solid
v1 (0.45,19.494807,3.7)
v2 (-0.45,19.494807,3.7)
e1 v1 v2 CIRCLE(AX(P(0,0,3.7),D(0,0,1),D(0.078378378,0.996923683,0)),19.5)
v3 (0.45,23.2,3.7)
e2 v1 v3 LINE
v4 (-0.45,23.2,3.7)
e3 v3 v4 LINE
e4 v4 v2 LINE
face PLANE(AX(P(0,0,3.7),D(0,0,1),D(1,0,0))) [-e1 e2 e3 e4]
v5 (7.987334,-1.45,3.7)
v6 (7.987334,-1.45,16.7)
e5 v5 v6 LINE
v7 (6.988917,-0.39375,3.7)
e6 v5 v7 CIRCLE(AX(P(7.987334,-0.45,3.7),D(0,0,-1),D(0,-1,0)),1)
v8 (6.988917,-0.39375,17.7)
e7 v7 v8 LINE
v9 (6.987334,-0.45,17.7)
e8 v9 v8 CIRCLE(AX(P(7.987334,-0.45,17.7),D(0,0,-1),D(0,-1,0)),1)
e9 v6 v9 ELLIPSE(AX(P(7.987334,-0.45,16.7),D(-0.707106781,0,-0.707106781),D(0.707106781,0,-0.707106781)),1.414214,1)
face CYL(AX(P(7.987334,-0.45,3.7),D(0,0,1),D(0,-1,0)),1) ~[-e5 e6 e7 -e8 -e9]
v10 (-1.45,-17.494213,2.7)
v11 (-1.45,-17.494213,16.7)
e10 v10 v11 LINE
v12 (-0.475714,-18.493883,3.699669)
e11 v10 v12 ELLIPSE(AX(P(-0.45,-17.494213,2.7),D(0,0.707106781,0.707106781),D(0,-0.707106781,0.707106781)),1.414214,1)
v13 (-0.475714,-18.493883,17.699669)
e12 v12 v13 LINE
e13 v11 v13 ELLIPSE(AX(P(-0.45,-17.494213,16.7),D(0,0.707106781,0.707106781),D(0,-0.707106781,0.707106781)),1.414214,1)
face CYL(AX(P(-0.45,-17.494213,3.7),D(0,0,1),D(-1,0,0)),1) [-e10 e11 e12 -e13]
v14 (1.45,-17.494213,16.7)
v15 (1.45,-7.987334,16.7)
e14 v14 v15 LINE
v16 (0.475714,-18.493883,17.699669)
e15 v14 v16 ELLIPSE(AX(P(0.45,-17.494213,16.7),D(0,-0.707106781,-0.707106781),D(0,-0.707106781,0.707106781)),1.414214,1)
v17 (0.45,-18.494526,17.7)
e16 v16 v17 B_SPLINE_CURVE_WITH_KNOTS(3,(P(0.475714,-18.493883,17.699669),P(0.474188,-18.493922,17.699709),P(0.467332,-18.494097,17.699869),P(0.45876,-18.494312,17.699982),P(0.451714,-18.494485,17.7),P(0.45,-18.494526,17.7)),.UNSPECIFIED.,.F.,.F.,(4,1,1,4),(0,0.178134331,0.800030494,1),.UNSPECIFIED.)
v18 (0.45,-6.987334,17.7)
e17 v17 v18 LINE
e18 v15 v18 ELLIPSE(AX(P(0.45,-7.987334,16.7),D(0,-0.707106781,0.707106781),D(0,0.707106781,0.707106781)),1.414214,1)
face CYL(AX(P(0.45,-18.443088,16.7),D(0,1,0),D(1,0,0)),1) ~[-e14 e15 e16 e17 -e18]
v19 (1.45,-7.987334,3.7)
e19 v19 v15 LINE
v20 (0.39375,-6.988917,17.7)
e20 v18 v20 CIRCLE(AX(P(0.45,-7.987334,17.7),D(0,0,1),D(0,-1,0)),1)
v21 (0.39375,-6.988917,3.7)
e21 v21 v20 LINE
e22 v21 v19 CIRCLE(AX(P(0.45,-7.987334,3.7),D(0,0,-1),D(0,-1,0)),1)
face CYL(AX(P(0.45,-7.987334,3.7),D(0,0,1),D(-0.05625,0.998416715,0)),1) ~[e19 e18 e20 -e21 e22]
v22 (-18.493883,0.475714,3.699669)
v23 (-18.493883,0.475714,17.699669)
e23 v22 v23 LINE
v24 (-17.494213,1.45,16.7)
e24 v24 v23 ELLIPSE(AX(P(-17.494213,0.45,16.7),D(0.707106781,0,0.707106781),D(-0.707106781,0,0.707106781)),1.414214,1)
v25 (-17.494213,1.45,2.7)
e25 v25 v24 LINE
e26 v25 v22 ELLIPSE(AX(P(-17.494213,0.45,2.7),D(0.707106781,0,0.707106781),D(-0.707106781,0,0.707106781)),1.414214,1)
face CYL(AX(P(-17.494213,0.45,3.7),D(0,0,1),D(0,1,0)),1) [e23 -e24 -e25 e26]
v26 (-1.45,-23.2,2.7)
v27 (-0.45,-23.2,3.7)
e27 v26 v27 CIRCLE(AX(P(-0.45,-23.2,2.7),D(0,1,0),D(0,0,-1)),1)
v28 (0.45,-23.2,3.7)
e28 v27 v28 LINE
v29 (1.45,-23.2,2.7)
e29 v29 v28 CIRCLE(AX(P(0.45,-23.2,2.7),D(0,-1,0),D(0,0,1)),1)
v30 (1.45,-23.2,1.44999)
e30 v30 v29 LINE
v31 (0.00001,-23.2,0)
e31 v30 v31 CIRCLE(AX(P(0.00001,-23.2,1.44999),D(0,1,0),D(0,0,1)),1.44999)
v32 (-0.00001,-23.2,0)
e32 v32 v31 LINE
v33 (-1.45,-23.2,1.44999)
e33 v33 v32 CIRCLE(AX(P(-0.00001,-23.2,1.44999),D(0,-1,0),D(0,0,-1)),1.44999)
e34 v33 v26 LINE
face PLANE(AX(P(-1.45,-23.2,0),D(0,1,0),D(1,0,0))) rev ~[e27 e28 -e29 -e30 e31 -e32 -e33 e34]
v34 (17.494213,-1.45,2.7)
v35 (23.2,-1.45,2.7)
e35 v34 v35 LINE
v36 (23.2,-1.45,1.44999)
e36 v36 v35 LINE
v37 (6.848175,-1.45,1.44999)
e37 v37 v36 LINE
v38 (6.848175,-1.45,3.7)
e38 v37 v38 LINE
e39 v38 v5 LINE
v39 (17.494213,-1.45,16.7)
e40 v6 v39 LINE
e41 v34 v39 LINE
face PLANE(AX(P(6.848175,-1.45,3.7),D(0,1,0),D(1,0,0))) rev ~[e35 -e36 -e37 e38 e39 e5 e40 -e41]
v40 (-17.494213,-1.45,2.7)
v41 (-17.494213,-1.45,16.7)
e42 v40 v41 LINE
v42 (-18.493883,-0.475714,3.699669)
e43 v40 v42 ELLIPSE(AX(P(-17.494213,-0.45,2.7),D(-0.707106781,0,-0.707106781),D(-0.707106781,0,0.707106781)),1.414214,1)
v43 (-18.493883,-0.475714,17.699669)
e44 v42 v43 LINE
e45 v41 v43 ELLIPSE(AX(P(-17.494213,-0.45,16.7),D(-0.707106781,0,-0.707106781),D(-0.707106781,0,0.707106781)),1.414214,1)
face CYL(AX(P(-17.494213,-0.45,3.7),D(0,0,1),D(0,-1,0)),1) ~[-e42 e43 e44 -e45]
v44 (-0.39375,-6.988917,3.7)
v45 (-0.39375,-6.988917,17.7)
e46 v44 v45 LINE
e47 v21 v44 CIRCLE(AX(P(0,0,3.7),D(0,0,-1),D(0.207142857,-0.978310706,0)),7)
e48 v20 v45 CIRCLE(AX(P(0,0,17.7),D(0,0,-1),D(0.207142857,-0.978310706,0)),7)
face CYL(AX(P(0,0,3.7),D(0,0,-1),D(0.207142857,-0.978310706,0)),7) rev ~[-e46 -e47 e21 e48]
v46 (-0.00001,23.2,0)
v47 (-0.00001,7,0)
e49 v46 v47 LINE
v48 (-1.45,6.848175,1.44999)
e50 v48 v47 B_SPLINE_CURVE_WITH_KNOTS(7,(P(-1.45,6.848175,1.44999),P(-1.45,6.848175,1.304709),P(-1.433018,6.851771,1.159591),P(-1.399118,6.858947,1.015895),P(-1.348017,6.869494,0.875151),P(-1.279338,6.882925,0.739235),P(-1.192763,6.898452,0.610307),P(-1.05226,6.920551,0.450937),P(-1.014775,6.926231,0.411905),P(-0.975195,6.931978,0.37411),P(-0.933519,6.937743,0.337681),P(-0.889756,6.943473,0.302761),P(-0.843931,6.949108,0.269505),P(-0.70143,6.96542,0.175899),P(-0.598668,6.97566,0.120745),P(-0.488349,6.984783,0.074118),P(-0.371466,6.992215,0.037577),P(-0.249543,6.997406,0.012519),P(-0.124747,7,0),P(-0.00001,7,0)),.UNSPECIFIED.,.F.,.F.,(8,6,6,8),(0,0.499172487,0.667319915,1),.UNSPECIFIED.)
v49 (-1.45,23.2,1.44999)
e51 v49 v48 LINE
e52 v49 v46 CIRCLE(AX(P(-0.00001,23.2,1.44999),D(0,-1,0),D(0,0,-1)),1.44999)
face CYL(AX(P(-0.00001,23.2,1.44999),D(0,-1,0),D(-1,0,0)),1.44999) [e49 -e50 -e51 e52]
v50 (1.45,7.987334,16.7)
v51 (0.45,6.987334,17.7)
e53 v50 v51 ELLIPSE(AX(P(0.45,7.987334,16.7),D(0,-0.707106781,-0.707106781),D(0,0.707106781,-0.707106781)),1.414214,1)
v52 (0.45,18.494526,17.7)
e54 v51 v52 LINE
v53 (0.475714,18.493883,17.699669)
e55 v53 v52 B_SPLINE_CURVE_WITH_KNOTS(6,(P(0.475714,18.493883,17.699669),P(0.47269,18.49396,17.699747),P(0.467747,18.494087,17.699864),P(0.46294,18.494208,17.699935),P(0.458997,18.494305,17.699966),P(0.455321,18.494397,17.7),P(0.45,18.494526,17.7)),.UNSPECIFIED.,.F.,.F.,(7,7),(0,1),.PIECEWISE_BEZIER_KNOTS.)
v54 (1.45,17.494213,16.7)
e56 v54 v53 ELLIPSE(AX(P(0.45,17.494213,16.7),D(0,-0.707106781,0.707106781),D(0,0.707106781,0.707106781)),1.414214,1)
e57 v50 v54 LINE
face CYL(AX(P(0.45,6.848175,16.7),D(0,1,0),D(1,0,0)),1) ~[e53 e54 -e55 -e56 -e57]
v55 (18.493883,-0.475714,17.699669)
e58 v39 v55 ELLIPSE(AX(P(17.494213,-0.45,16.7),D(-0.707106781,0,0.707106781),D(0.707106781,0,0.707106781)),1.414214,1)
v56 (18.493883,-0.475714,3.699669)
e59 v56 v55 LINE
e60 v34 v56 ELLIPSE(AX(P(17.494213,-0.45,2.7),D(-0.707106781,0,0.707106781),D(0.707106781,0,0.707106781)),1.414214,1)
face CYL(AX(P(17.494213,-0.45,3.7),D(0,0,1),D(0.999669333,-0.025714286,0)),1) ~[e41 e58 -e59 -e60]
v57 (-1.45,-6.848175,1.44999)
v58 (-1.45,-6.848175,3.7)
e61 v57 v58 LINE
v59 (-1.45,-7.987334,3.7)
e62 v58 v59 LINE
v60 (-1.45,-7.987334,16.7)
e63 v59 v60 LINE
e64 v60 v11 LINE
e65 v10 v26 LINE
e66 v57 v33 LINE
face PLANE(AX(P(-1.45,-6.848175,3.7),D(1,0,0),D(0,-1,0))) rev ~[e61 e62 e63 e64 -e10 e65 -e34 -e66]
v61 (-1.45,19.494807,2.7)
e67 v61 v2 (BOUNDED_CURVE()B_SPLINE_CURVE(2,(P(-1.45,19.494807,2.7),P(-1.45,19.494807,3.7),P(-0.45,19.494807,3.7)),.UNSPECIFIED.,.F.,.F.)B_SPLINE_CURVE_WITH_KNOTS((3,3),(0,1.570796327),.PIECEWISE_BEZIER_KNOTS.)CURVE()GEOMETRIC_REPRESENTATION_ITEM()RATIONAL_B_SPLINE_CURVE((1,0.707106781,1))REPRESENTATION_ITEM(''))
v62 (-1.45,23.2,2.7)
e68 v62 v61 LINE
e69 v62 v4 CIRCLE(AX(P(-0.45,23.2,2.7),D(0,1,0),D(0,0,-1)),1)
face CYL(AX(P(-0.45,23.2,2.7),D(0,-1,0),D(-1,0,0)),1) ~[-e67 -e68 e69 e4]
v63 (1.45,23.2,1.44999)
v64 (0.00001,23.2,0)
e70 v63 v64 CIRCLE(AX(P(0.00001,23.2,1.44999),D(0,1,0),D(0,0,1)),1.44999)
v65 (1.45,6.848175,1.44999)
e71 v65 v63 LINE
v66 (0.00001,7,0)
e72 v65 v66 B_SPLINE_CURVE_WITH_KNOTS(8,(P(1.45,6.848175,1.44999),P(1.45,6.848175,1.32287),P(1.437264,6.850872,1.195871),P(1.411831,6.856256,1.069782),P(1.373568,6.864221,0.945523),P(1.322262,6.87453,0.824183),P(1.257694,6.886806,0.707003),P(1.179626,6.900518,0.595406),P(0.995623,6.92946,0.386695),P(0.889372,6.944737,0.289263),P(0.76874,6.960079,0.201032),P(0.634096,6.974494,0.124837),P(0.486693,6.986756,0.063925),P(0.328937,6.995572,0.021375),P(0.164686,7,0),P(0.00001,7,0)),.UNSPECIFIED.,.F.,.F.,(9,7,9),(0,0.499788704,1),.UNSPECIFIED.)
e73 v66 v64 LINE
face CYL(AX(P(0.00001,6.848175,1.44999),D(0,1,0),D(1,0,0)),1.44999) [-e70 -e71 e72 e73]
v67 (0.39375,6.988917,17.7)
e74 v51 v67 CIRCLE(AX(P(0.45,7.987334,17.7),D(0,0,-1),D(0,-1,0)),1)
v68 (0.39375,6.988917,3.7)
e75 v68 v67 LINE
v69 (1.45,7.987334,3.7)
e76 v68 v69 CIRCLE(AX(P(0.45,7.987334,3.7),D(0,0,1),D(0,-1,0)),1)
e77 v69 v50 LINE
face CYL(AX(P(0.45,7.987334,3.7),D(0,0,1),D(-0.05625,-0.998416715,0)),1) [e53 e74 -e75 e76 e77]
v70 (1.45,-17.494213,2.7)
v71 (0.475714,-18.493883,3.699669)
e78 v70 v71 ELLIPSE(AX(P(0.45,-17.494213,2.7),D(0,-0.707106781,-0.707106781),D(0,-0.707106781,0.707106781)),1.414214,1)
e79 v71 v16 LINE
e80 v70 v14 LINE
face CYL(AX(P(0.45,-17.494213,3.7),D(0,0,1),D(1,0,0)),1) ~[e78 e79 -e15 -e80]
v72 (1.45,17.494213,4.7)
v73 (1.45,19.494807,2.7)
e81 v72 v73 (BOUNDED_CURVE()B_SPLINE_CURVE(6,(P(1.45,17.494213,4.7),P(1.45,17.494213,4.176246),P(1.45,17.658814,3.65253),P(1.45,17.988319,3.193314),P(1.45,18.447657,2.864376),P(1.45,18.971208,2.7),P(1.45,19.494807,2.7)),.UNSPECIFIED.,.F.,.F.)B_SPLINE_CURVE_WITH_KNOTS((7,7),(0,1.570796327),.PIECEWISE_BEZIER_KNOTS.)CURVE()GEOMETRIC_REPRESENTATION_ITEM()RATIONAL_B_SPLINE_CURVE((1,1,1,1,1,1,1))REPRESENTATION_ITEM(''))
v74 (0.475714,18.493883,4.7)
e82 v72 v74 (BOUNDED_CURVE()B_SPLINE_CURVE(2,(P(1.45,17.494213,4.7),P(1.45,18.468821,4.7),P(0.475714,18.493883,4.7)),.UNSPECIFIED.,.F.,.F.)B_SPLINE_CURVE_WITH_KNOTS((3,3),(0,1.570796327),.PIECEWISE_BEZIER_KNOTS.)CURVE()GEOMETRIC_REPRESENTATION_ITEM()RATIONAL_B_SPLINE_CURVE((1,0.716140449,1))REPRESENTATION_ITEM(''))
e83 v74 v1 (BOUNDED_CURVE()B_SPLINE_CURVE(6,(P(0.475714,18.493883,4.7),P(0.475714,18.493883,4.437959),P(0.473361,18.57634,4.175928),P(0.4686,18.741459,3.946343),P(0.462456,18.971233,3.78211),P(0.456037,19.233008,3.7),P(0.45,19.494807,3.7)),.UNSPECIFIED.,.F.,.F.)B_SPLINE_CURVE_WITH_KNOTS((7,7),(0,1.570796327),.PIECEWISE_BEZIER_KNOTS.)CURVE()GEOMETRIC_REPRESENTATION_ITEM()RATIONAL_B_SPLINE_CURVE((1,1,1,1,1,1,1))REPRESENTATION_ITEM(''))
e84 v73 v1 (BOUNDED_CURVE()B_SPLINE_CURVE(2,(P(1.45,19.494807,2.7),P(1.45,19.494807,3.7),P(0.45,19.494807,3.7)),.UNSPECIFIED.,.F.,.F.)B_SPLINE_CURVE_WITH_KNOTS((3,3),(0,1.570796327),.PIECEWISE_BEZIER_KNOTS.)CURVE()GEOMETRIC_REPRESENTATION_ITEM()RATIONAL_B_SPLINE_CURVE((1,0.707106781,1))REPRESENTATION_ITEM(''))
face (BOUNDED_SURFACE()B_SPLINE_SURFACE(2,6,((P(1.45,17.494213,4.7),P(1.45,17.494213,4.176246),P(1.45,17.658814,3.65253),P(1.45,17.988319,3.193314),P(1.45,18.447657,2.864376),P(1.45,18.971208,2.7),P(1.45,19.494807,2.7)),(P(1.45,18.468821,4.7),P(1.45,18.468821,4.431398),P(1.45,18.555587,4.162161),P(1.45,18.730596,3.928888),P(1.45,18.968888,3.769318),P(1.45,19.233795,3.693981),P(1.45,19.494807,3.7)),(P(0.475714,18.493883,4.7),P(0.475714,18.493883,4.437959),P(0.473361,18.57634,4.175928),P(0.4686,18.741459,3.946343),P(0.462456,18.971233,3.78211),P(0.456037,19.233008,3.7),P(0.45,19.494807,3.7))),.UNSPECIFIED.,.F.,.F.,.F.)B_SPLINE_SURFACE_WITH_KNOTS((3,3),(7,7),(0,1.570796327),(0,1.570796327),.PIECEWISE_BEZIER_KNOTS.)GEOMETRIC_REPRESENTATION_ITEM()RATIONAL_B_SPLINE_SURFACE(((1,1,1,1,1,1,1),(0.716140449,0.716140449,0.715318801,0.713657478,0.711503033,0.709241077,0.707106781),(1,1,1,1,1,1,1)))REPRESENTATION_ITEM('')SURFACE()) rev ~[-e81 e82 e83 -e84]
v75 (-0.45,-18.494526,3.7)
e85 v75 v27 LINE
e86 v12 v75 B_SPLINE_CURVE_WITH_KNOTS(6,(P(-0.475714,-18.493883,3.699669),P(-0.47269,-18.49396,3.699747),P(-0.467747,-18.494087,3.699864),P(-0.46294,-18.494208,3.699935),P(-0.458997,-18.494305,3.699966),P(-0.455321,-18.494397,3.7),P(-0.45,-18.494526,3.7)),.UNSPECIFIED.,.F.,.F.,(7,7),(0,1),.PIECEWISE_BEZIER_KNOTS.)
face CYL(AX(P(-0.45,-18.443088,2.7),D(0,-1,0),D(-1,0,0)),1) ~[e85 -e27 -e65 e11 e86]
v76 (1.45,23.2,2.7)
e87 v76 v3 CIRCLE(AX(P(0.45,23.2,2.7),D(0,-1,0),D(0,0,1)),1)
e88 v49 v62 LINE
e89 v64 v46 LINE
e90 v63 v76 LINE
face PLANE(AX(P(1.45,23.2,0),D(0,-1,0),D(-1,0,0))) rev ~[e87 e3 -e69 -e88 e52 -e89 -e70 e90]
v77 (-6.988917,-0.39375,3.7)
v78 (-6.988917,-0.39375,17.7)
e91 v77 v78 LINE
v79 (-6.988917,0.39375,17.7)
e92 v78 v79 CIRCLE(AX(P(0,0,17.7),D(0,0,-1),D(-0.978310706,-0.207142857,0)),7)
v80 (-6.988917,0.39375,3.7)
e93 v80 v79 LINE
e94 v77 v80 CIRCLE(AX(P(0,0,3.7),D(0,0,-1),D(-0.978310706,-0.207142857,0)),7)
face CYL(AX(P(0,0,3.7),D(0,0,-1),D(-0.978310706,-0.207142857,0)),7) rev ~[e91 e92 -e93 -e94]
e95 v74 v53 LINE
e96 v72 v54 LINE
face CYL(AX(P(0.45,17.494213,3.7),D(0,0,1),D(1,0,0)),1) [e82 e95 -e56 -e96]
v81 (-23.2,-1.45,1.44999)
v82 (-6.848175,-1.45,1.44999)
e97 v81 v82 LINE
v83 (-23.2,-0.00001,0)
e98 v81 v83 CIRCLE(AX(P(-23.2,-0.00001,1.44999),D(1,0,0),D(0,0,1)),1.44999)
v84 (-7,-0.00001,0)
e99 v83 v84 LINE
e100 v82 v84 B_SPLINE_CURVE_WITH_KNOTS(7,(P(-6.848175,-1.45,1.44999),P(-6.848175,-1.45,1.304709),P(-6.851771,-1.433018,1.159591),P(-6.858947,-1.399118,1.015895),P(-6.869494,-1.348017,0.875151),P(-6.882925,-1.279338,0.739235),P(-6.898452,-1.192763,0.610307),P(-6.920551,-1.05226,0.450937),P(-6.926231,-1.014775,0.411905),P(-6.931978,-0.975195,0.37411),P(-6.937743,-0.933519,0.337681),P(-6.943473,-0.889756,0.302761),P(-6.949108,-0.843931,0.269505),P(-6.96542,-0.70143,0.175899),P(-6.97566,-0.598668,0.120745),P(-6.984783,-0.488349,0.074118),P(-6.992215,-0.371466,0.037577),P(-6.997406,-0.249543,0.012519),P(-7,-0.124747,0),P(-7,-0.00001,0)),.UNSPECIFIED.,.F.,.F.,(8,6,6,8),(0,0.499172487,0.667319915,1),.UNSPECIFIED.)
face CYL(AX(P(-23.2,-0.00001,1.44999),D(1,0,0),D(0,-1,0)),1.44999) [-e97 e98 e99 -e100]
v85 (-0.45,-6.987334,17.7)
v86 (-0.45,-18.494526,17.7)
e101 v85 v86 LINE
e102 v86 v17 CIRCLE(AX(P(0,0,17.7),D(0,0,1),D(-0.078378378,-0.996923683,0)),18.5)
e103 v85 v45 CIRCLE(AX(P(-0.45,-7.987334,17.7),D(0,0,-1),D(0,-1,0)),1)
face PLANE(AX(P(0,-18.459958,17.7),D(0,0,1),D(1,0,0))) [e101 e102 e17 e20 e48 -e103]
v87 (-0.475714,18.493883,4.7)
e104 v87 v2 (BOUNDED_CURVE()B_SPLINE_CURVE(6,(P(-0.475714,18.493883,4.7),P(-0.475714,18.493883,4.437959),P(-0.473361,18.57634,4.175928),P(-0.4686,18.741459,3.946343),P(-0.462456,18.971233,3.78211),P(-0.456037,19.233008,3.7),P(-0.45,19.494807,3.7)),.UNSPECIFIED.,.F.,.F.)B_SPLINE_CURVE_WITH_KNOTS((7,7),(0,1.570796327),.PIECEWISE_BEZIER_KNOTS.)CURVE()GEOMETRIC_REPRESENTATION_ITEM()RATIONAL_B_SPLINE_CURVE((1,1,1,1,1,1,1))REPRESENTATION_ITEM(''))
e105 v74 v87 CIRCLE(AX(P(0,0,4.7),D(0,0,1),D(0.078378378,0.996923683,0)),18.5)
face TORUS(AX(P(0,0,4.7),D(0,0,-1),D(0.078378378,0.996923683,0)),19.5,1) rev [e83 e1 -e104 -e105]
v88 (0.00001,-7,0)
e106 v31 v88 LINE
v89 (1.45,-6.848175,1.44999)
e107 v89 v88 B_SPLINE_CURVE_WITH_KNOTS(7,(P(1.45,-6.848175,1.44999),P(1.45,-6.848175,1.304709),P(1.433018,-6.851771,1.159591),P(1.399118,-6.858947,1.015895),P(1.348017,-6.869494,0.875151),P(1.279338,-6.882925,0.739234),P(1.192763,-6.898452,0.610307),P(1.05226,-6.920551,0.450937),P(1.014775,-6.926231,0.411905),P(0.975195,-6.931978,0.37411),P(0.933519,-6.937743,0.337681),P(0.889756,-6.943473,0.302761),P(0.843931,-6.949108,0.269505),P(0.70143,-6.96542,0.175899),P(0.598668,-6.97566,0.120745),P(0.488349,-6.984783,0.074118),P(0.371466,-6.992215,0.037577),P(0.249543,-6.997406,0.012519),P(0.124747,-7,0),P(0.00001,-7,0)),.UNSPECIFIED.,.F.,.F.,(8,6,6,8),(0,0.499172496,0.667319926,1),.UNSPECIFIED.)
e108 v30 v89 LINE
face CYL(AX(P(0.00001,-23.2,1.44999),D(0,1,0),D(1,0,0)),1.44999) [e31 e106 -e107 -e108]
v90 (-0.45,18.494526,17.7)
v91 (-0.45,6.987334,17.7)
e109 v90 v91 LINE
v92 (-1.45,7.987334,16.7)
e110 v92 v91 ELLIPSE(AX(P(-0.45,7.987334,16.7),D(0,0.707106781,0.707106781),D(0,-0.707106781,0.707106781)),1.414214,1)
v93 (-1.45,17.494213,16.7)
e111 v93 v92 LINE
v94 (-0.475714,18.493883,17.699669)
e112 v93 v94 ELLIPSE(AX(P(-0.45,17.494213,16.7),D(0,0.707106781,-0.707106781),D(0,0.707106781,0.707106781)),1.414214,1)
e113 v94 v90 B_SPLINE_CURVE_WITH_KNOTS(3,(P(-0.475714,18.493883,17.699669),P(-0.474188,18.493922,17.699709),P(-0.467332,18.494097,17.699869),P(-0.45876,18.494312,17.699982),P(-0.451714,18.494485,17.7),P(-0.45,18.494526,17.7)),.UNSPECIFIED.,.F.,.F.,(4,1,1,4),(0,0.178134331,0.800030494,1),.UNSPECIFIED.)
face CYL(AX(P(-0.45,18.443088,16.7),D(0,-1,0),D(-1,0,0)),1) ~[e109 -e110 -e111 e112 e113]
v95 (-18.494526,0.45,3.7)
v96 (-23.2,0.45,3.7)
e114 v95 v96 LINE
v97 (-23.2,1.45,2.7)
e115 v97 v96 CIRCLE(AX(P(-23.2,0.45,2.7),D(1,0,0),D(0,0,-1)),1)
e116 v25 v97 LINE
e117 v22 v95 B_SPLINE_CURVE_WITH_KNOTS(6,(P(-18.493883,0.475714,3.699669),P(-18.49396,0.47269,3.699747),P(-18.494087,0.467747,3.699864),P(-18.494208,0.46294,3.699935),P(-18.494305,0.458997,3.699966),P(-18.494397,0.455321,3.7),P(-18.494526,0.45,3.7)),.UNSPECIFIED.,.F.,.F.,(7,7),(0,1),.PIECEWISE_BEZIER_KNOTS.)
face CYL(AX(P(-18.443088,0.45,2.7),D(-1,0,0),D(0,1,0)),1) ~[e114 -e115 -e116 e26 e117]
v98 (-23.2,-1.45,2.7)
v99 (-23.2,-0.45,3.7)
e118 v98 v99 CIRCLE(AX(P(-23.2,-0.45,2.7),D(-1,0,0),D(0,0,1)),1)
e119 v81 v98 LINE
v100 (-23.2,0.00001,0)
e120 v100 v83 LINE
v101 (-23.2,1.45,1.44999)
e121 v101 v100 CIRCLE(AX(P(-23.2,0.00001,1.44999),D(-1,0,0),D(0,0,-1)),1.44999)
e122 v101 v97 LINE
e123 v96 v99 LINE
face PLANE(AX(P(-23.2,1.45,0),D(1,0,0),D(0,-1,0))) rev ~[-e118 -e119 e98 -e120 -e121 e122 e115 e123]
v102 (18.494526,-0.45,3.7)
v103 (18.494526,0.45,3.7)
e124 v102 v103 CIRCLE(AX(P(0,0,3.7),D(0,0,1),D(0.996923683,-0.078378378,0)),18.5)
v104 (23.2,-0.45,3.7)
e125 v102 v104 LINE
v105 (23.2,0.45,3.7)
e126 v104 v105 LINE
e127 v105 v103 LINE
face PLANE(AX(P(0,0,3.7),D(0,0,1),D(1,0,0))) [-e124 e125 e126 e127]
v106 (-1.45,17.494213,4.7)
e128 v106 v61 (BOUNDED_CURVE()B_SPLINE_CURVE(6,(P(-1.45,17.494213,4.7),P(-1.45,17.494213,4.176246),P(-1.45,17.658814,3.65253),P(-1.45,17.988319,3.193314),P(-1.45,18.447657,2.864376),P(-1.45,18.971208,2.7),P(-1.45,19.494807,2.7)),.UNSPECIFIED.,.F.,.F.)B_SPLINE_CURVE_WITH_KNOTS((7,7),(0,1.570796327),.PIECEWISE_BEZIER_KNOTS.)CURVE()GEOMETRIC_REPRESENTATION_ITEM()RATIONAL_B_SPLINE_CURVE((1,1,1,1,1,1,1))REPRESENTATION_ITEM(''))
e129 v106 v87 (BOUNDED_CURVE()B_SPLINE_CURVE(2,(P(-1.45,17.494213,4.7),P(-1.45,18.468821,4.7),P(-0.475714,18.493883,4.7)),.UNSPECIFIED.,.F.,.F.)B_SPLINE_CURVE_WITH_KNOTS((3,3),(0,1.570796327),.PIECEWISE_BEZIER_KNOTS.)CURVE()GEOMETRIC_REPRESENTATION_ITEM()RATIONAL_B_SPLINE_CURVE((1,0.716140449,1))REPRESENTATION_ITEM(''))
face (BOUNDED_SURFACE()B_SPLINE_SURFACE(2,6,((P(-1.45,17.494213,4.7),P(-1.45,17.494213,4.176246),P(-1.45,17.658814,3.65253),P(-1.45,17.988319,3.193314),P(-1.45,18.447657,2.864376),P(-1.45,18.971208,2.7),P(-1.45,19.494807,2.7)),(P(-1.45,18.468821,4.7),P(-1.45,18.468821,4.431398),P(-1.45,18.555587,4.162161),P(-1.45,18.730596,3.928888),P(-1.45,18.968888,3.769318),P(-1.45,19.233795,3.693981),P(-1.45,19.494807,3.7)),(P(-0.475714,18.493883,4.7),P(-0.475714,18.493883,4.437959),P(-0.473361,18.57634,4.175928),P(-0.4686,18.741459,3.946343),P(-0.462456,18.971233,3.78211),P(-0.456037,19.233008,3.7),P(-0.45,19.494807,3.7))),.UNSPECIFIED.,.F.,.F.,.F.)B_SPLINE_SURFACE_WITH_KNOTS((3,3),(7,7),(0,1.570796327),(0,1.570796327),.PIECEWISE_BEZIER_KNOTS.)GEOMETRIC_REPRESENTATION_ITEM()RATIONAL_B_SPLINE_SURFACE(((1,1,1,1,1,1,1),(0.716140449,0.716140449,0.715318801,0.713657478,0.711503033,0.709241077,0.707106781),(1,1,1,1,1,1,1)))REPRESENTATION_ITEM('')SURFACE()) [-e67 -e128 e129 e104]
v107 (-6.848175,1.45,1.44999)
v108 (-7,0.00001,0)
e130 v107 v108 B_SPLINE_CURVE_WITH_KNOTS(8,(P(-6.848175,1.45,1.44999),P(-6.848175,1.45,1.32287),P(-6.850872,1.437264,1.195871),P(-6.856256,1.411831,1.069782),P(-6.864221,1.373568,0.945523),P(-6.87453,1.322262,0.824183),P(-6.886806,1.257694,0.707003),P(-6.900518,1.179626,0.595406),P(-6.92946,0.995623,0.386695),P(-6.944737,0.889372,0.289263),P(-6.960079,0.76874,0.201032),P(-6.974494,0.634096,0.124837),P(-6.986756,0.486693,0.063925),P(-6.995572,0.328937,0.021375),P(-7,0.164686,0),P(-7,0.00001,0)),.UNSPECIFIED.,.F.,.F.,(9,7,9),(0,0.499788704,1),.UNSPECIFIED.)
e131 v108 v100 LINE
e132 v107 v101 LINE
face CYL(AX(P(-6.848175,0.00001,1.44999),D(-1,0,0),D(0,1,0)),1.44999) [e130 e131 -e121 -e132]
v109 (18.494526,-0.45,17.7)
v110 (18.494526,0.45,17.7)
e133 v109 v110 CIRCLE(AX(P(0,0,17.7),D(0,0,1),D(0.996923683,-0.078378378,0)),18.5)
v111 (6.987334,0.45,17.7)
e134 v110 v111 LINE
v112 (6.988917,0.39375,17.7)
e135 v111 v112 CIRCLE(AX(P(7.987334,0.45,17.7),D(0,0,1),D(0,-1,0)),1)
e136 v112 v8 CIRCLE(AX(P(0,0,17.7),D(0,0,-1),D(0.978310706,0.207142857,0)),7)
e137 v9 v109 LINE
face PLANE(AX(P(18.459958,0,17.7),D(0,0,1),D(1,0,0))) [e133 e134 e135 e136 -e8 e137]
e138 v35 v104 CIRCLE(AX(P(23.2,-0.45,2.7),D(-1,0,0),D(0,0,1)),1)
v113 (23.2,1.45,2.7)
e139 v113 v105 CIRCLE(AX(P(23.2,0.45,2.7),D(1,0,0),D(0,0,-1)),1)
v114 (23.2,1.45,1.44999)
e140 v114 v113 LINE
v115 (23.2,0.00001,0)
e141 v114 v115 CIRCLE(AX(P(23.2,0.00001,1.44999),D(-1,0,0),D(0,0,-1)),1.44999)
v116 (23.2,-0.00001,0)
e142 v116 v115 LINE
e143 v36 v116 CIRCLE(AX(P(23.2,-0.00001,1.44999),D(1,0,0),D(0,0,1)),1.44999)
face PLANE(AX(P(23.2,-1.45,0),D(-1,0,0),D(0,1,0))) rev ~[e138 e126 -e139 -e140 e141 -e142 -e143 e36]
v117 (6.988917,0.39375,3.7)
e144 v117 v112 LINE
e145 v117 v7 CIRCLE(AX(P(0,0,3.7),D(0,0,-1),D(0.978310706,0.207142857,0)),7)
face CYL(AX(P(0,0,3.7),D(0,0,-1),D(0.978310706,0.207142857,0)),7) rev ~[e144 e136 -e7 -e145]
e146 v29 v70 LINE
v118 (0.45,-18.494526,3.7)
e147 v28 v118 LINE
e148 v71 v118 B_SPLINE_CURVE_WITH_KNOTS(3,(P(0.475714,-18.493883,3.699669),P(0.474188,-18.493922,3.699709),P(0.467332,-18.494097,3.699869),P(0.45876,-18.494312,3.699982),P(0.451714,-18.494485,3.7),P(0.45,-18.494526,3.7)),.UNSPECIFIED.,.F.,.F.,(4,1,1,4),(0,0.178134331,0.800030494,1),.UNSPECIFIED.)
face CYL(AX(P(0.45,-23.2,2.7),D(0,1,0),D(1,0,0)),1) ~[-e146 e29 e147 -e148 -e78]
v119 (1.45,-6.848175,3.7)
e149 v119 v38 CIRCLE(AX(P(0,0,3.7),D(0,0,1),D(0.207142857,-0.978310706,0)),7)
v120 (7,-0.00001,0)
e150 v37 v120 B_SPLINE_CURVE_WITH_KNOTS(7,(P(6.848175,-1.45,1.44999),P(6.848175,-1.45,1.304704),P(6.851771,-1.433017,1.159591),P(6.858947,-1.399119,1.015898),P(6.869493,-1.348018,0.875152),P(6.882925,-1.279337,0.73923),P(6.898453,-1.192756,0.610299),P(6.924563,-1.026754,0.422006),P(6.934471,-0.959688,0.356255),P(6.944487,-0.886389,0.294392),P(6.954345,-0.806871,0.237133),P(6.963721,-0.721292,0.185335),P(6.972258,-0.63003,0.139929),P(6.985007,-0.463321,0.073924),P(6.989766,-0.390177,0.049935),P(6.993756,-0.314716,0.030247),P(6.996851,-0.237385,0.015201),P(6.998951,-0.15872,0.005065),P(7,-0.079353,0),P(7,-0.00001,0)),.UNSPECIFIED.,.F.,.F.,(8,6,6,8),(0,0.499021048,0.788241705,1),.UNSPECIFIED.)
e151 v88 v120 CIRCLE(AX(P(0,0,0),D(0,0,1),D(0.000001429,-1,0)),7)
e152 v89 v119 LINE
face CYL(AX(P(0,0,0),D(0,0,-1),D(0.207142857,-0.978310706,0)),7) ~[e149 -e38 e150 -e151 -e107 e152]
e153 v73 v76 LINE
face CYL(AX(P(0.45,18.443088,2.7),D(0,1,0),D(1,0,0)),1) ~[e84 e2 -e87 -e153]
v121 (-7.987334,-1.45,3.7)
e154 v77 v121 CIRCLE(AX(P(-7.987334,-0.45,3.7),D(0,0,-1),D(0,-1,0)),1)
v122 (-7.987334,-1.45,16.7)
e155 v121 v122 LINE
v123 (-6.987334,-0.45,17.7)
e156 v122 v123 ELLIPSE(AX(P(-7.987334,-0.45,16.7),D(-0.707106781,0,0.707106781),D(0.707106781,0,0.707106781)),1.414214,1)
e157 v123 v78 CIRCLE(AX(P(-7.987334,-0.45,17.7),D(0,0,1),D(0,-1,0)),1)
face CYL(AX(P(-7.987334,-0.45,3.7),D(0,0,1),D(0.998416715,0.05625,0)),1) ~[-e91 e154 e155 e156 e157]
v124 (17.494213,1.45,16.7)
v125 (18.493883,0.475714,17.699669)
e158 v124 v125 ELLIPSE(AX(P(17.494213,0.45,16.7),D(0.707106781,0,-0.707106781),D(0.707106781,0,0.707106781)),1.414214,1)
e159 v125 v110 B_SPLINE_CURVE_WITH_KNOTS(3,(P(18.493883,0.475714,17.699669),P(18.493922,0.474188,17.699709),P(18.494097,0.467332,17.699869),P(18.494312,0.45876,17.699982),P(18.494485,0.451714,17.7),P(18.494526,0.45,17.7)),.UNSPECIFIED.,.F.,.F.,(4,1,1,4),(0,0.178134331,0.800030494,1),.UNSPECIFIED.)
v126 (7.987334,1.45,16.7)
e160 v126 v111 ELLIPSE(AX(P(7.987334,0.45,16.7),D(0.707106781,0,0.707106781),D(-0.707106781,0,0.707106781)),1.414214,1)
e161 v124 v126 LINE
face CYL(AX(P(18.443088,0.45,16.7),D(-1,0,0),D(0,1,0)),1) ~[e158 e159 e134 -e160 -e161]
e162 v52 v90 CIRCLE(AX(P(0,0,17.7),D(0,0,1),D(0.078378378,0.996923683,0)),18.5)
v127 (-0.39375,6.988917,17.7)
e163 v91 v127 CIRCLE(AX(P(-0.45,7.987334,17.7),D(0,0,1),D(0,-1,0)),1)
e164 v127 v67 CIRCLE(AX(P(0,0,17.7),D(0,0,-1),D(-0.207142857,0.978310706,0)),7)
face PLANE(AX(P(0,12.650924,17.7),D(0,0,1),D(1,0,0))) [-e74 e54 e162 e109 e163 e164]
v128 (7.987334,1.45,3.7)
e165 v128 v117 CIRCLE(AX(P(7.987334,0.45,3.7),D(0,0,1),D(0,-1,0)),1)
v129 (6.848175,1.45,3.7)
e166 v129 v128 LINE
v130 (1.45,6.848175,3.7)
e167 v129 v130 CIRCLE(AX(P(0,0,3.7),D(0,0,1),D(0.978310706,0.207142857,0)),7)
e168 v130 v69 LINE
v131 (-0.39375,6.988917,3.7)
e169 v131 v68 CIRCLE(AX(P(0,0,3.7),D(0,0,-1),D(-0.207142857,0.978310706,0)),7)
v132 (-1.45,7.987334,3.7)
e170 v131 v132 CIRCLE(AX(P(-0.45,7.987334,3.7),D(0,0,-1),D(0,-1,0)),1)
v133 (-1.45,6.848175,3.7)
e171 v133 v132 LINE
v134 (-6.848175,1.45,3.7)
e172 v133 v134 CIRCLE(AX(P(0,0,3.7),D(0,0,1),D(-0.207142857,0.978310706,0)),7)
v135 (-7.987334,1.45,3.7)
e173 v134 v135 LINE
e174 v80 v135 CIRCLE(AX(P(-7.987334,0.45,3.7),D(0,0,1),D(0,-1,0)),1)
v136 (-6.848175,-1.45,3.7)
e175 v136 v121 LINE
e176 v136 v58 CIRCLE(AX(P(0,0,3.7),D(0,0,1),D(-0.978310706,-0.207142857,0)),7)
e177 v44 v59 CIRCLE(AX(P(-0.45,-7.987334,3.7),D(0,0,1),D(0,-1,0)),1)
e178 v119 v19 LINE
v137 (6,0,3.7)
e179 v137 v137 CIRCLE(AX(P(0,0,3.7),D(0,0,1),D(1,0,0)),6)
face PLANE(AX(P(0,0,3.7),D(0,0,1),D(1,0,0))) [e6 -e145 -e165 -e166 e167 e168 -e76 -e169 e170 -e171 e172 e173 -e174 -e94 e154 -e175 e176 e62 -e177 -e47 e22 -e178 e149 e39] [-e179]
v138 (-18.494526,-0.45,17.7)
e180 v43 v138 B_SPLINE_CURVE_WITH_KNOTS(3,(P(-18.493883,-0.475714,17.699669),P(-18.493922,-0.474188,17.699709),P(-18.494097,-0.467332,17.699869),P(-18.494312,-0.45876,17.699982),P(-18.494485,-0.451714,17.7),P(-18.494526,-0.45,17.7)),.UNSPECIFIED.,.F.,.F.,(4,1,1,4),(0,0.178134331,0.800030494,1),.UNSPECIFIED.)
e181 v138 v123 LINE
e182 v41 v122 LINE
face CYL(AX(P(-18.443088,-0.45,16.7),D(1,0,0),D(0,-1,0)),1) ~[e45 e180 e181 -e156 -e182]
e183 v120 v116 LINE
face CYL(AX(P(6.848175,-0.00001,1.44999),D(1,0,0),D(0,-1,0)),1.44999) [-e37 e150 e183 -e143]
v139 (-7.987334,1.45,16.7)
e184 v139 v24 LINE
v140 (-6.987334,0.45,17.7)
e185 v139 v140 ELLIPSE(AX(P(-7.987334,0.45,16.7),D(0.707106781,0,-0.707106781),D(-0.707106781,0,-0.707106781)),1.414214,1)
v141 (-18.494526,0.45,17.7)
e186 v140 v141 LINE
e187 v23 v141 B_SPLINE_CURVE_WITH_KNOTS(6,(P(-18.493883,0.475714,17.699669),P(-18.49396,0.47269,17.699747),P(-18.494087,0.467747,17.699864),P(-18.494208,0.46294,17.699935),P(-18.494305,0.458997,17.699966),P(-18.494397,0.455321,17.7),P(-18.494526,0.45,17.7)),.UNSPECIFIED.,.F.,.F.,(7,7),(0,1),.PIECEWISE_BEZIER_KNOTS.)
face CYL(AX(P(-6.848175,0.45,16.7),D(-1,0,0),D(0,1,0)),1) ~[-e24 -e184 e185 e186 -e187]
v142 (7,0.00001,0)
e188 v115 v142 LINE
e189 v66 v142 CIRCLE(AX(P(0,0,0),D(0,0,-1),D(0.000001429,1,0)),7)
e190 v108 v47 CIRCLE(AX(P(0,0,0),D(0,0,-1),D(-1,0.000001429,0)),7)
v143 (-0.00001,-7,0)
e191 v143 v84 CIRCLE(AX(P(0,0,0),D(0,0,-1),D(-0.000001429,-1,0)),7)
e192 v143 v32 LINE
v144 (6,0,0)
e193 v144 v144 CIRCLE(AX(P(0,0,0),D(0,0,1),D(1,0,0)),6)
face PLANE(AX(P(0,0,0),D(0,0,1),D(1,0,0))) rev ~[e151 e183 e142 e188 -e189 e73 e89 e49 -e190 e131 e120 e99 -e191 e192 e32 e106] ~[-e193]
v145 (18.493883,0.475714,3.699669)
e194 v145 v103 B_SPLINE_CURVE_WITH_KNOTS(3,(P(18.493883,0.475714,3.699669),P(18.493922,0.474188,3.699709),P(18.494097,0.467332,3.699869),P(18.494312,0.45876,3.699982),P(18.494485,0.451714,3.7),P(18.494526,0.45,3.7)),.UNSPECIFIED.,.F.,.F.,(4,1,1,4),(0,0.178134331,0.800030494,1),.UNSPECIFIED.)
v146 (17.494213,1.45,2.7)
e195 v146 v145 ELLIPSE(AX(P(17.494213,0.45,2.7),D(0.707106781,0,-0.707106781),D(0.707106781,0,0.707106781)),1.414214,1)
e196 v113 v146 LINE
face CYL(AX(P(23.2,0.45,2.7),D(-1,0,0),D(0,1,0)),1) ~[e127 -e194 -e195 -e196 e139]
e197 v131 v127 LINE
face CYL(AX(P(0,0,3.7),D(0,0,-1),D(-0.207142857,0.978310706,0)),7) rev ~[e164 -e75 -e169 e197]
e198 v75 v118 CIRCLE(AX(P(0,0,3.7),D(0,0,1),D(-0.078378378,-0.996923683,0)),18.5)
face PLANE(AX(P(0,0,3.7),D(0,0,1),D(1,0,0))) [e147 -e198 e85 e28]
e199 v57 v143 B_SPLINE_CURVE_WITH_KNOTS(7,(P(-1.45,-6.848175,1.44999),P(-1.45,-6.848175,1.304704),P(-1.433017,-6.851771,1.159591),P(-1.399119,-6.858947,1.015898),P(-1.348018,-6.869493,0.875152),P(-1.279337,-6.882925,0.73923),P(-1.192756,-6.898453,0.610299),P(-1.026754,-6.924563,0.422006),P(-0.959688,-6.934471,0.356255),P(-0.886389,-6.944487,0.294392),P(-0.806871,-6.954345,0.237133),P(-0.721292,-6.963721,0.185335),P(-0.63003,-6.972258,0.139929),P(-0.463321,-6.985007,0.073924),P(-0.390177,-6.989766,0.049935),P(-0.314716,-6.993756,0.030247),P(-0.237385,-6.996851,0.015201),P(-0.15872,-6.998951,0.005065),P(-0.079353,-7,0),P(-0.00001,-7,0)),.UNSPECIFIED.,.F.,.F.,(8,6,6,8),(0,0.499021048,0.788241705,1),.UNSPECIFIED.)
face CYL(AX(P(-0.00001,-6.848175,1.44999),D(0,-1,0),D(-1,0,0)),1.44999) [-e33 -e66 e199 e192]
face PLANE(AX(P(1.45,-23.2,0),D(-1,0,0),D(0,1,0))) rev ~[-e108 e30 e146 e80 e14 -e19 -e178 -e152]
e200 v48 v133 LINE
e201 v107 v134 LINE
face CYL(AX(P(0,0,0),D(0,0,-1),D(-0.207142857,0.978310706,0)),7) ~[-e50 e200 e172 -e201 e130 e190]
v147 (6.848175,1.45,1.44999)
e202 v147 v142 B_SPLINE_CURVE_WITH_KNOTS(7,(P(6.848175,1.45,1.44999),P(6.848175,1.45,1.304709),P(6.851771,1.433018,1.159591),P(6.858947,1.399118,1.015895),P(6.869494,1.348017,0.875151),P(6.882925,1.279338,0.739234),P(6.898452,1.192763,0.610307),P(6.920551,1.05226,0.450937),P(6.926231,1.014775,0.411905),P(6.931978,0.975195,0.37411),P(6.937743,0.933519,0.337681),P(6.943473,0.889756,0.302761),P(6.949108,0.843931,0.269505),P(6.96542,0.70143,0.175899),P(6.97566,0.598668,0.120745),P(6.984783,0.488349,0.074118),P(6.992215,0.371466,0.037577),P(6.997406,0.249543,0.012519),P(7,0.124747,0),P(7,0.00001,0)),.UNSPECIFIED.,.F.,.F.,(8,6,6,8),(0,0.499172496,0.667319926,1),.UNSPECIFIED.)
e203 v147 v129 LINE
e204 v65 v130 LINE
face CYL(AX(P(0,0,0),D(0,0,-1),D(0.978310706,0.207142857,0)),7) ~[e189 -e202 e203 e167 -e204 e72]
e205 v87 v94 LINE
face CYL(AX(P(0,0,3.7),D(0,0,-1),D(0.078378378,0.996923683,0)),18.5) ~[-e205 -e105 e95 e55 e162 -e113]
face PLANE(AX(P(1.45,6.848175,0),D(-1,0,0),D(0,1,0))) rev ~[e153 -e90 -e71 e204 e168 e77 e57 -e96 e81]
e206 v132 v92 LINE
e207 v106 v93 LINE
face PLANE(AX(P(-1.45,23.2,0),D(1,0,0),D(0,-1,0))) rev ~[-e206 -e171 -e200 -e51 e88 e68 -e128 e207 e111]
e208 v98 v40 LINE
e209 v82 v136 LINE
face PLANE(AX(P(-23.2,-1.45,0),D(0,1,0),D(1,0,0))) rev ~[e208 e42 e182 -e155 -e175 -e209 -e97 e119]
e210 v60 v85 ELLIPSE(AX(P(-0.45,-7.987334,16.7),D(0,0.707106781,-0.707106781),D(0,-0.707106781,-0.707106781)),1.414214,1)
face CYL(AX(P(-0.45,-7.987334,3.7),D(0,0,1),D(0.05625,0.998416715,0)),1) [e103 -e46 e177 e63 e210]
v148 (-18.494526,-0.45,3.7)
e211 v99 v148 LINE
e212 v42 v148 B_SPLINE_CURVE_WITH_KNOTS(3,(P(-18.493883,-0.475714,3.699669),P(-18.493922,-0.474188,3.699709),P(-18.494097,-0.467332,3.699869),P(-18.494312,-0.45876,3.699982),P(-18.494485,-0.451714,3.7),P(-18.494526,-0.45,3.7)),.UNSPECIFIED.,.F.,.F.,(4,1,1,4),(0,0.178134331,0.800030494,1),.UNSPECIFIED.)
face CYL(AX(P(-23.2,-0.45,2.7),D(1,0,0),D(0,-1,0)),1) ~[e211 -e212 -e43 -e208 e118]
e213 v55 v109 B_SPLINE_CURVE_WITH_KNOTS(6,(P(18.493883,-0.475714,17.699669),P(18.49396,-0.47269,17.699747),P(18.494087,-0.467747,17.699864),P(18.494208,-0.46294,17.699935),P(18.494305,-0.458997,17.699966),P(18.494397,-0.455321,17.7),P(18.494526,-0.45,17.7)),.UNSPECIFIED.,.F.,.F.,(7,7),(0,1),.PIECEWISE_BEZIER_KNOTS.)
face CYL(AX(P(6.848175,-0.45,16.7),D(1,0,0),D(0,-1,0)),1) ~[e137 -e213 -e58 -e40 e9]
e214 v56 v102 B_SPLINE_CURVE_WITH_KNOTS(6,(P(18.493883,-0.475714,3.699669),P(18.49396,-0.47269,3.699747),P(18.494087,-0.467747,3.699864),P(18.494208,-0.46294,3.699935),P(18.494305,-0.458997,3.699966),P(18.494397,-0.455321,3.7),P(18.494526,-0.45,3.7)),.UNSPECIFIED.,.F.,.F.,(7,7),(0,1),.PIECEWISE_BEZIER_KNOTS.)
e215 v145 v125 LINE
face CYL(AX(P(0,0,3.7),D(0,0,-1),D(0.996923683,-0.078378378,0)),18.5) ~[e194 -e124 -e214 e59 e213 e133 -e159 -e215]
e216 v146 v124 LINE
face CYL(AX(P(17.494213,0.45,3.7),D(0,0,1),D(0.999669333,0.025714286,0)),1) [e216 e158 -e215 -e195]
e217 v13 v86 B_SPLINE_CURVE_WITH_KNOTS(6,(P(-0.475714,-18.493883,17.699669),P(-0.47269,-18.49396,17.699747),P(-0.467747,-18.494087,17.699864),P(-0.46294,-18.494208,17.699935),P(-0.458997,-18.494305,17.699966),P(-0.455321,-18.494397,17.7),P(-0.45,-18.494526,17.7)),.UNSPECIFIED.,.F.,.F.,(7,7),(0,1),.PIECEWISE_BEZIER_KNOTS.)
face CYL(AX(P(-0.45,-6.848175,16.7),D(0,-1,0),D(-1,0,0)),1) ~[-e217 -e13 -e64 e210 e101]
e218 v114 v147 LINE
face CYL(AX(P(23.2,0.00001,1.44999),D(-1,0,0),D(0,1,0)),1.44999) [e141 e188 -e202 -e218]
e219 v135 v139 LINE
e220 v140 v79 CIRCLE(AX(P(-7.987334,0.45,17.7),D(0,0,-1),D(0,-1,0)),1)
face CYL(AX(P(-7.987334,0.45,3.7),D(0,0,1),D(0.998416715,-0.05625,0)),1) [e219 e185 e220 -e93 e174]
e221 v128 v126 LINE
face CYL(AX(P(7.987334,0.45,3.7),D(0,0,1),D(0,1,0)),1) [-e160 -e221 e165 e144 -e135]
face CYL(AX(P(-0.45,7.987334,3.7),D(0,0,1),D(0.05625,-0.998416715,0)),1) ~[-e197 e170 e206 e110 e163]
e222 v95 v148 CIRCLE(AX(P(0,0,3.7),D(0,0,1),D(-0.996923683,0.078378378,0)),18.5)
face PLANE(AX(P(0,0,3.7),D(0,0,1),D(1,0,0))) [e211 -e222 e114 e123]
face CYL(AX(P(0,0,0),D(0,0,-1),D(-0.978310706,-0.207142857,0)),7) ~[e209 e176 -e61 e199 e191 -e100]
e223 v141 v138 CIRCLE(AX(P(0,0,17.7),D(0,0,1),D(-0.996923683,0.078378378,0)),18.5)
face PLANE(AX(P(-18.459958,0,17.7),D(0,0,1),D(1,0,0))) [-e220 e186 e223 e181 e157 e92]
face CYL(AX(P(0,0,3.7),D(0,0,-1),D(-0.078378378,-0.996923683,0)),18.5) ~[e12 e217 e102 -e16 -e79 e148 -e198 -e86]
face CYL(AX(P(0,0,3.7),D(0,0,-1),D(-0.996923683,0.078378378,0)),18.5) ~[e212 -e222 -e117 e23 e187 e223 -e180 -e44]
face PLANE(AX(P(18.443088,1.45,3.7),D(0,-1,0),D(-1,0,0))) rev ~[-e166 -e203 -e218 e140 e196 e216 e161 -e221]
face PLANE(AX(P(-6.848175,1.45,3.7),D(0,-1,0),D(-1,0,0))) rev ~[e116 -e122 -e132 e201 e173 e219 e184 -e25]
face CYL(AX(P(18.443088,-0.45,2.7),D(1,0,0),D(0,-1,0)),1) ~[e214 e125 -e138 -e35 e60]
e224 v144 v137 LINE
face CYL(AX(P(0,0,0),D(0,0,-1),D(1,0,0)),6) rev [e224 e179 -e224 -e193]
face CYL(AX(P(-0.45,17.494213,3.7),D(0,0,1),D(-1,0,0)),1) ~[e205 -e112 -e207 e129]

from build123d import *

# Parameters (mm, degrees)
F0_R     = 6
F1_DEPTH = 3.7
F2_R     = 1.44999
F4_DEPTH = 14
F5_R     = 1


# Not quite as in the source:
# - a fillet or chamfer is up to 0.001 mm smaller than in the source, because OpenCascade refuses the exact size


with BuildPart() as f1:
    # F0 (on Top) → F1 (new body)
    with BuildSketch(Plane.XY):
        with BuildLine():
            ThreePointArc((6.8481749394, -1.45), (6.9619402675, -0.7289634506), (7, 0))
            ThreePointArc((7, 0), (6.9619402675, 0.7289634506), (6.8481749394, 1.45))
            ThreePointArc((6.8481749394, 1.45), (4.9497474683, 4.9497474683), (1.45, 6.8481749394))
            ThreePointArc((1.45, 6.8481749394), (0.7289634506, 6.9619402675), (0, 7))
            ThreePointArc((0, 7), (-0.7289634506, 6.9619402675), (-1.45, 6.8481749394))
            ThreePointArc((-1.45, 6.8481749394), (-4.9497474683, 4.9497474683), (-6.8481749394, 1.45))
            ThreePointArc((-6.8481749394, 1.45), (-6.9619402675, 0.7289634506), (-7, 0))
            ThreePointArc((-7, 0), (-6.9619402675, -0.7289634506), (-6.8481749394, -1.45))
            ThreePointArc((-6.8481749394, -1.45), (-4.9497474683, -4.9497474683), (-1.45, -6.8481749394))
            ThreePointArc((-1.45, -6.8481749394), (-0.7289634506, -6.9619402675), (0, -7))
            ThreePointArc((0, -7), (0.7289634506, -6.9619402675), (1.45, -6.8481749394))
            ThreePointArc((1.45, -6.8481749394), (4.9497474683, -4.9497474683), (6.8481749394, -1.45))
        make_face()
        Circle(F0_R, mode=Mode.SUBTRACT)
        with BuildLine():
            Line((23.2, 0), (7, 0))
            ThreePointArc((7, 0), (6.9619402675, -0.7289634506), (6.8481749394, -1.45))
            Line((6.8481749394, -1.45), (23.2, -1.45))
            Line((23.2, -1.45), (23.2, 0))
        make_face()
        with BuildLine():
            ThreePointArc((6.8481749394, 1.45), (6.9619402675, 0.7289634506), (7, 0))
            Line((7, 0), (23.2, 0))
            Line((23.2, 0), (23.2, 1.45))
            Line((23.2, 1.45), (6.8481749394, 1.45))
        make_face()
        with BuildLine():
            ThreePointArc((0, 7), (0.7289634506, 6.9619402675), (1.45, 6.8481749394))
            Line((1.45, 6.8481749394), (1.45, 23.2))
            Line((1.45, 23.2), (0, 23.2))
            Line((0, 23.2), (0, 7))
        make_face()
        with BuildLine():
            Line((1.45, -23.2), (1.45, -6.8481749394))
            ThreePointArc((1.45, -6.8481749394), (0.7289634506, -6.9619402675), (0, -7))
            Line((0, -7), (0, -23.2))
            Line((0, -23.2), (1.45, -23.2))
        make_face()
        with BuildLine():
            ThreePointArc((-1.45, 6.8481749394), (-0.7289634506, 6.9619402675), (0, 7))
            Line((0, 7), (0, 23.2))
            Line((0, 23.2), (-1.45, 23.2))
            Line((-1.45, 23.2), (-1.45, 6.8481749394))
        make_face()
        with BuildLine():
            Line((0, -23.2), (0, -7))
            ThreePointArc((0, -7), (-0.7289634506, -6.9619402675), (-1.45, -6.8481749394))
            Line((-1.45, -6.8481749394), (-1.45, -23.2))
            Line((-1.45, -23.2), (0, -23.2))
        make_face()
        with BuildLine():
            ThreePointArc((-7, 0), (-6.9619402675, 0.7289634506), (-6.8481749394, 1.45))
            Line((-6.8481749394, 1.45), (-23.2, 1.45))
            Line((-23.2, 1.45), (-23.2, 0))
            Line((-23.2, 0), (-7, 0))
        make_face()
        with BuildLine():
            Line((-23.2, -1.45), (-6.8481749394, -1.45))
            ThreePointArc((-6.8481749394, -1.45), (-6.9619402675, -0.7289634506), (-7, 0))
            Line((-7, 0), (-23.2, 0))
            Line((-23.2, 0), (-23.2, -1.45))
        make_face()
    extrude(amount=F1_DEPTH)

    # F2 (radius 1.45 in the source; OpenCascade refuses exactly that, so slightly less here)
    f2_edges = [f1.edges().sort_by_distance(p)[0] for p in [
        (1.45, 15.024087, 0),
        (15.024087, 1.45, 0),
        (15.024087, -1.45, 0),
        (1.45, -15.024087, 0),
        (-1.45, -15.024087, 0),
        (-15.024087, -1.45, 0),
        (-15.024087, 1.45, 0),
        (-1.45, 15.024087, 0),
    ]]
    fillet(f2_edges, radius=F2_R)

    # F3 (on face) → F4 (join)
    with BuildSketch(Plane.XY.offset(3.7)):
        with BuildLine():
            Line((18.4430881362, 1.45), (18.4430881362, -1.45))
            ThreePointArc((18.4430881362, -1.45), (18.5, 0), (18.4430881362, 1.45))
        make_face()
        with BuildLine():
            Line((6.8481749394, -1.45), (18.4430881362, -1.45))
            Line((18.4430881362, -1.45), (18.4430881362, 1.45))
            Line((18.4430881362, 1.45), (6.8481749394, 1.45))
            ThreePointArc((6.8481749394, 1.45), (7, 0), (6.8481749394, -1.45))
        make_face()
        with BuildLine():
            ThreePointArc((-18.4430881362, 1.45), (-18.5, 0), (-18.4430881362, -1.45))
            Line((-18.4430881362, -1.45), (-18.4430881362, 1.45))
        make_face()
        with BuildLine():
            Line((-18.4430881362, 1.45), (-18.4430881362, -1.45))
            Line((-18.4430881362, -1.45), (-6.8481749394, -1.45))
            ThreePointArc((-6.8481749394, -1.45), (-7, 0), (-6.8481749394, 1.45))
            Line((-6.8481749394, 1.45), (-18.4430881362, 1.45))
        make_face()
        with BuildLine():
            ThreePointArc((-1.45, -18.4430881362), (0, -18.5), (1.45, -18.4430881362))
            Line((1.45, -18.4430881362), (-1.45, -18.4430881362))
        make_face()
        with BuildLine():
            Line((-1.45, -18.4430881362), (1.45, -18.4430881362))
            Line((1.45, -18.4430881362), (1.45, -6.8481749394))
            ThreePointArc((1.45, -6.8481749394), (0, -7), (-1.45, -6.8481749394))
            Line((-1.45, -6.8481749394), (-1.45, -18.4430881362))
        make_face()
        with BuildLine():
            Line((1.45, 6.8481749394), (1.45, 18.4430881362))
            Line((1.45, 18.4430881362), (-1.45, 18.4430881362))
            Line((-1.45, 18.4430881362), (-1.45, 6.8481749394))
            ThreePointArc((-1.45, 6.8481749394), (0, 7), (1.45, 6.8481749394))
        make_face()
        with BuildLine():
            Line((-1.45, 18.4430881362), (1.45, 18.4430881362))
            ThreePointArc((1.45, 18.4430881362), (0, 18.5), (-1.45, 18.4430881362))
        make_face()
    extrude(amount=F4_DEPTH)

    # F5
    f5_edges = [f1.edges().sort_by_distance(p)[0] for p in [
        (12.645632, 1.45, 17.7),
        (18.443088, 1.45, 10.7),
        (20.821544, 1.45, 3.7),
        (20.821544, -1.45, 3.7),
        (18.443088, -1.45, 10.7),
        (12.645632, -1.45, 17.7),
        (1.45, 12.645632, 17.7),
        (-1.45, 12.645632, 17.7),
        (1.45, 18.443088, 10.7),
        (-1.45, 18.443088, 10.7),
        (1.45, 20.821544, 3.7),
        (-1.45, 20.821544, 3.7),
        (0, 18.5, 3.7),
        (-18.443088, 1.45, 10.7),
        (-18.443088, -1.45, 10.7),
        (-20.821544, 1.45, 3.7),
        (-1.45, -18.443088, 10.7),
        (1.45, -18.443088, 10.7),
        (-1.45, -20.821544, 3.7),
        (1.45, -20.821544, 3.7),
        (-20.821544, -1.45, 3.7),
        (-12.645632, 1.45, 17.7),
        (-12.645632, -1.45, 17.7),
        (-1.45, -12.645632, 17.7),
        (1.45, -12.645632, 17.7),
        (-1.45, -6.848175, 10.7),
        (1.45, -6.848175, 10.7),
        (6.848175, -1.45, 10.7),
        (6.848175, 1.45, 10.7),
        (1.45, 6.848175, 10.7),
        (-1.45, 6.848175, 10.7),
        (-6.848175, 1.45, 10.7),
        (-6.848175, -1.45, 10.7),
    ]]
    fillet(f5_edges, radius=F5_R)


solid = f1.part
